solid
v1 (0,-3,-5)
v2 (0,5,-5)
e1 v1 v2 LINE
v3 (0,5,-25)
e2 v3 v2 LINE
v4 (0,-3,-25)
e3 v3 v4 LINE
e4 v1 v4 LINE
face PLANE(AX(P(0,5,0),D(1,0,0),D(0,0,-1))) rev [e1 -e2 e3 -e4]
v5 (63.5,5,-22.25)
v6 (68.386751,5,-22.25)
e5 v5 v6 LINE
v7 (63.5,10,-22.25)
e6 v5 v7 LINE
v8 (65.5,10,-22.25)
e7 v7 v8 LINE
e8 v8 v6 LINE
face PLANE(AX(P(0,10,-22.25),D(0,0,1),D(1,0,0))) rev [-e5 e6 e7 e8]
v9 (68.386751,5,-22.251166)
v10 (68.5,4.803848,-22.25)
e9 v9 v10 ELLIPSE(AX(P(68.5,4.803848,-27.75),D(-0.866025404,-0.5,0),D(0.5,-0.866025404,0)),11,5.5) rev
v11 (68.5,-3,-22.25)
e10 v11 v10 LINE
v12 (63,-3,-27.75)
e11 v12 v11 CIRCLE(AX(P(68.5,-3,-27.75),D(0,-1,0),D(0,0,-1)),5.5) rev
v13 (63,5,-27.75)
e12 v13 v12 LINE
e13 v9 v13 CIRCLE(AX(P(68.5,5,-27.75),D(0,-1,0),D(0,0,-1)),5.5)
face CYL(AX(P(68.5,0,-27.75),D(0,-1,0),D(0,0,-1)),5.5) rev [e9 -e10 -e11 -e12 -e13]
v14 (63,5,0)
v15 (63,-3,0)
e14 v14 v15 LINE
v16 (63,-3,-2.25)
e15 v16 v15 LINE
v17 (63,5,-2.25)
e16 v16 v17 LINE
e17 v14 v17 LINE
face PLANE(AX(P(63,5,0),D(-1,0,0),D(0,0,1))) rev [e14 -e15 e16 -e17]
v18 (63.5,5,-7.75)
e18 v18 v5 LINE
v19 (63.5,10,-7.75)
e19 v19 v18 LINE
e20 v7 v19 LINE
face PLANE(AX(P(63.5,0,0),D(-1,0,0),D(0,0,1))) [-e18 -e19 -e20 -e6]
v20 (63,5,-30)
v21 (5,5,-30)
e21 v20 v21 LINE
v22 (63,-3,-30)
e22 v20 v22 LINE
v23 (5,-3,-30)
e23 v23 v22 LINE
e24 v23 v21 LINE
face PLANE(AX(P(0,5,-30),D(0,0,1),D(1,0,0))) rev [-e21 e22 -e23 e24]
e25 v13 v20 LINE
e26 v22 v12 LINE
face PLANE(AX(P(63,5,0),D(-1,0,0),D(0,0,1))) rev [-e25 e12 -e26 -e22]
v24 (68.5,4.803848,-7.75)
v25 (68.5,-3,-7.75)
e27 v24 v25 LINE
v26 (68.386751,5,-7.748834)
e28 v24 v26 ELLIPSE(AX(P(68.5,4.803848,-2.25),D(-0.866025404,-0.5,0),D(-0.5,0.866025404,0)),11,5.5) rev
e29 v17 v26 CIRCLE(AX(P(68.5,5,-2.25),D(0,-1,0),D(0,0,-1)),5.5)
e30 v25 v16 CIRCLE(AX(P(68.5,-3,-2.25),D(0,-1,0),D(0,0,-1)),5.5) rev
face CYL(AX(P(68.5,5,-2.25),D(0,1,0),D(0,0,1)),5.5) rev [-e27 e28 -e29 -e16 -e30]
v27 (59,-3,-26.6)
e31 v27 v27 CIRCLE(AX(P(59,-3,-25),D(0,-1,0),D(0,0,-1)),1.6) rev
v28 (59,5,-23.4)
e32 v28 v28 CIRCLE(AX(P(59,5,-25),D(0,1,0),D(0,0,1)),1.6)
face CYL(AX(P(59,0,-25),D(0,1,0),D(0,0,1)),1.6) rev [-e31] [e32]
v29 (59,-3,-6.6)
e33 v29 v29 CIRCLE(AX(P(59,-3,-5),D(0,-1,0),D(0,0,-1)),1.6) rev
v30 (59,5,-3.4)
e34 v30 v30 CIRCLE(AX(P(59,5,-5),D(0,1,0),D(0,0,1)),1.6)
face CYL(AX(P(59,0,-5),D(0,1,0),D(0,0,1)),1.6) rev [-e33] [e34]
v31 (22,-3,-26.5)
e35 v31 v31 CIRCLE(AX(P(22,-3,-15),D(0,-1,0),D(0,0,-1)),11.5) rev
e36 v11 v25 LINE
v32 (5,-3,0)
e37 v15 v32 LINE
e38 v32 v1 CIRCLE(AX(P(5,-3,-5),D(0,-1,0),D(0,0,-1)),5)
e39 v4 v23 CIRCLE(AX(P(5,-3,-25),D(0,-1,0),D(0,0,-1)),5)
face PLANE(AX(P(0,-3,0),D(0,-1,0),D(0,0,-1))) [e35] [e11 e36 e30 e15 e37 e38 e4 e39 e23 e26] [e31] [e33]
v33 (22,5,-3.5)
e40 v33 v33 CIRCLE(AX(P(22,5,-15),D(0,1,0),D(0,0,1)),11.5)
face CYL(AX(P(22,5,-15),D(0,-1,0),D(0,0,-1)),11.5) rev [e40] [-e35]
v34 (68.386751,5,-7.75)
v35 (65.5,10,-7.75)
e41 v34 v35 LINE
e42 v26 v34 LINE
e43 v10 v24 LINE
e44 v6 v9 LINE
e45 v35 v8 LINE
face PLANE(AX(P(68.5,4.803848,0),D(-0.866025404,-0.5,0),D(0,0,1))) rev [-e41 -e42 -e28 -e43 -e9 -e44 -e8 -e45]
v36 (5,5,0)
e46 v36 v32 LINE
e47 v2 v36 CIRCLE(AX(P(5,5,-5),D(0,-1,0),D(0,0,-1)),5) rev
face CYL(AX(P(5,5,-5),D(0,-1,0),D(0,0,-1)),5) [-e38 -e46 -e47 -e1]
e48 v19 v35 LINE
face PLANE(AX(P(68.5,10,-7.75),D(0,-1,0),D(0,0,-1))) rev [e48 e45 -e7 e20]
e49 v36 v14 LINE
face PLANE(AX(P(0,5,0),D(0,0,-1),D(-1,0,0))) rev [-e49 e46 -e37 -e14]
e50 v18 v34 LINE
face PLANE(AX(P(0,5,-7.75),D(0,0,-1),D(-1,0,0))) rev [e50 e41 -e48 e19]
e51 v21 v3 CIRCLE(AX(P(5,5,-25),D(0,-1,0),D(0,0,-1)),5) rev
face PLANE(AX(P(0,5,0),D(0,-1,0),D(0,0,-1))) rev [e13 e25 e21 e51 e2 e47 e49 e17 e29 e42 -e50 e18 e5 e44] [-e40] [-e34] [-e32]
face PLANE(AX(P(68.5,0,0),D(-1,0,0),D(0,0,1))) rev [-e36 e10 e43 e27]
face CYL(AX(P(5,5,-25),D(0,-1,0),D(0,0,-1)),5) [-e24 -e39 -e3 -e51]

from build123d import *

# Parameters (mm, degrees)
SKETCH1_W           = 63
SKETCH1_H           = 30
SKETCH1_R           = 11.5
BOSS_EXTRUDE1_DEPTH = 5
SKETCH2_R           = 1.6
CUT_EXTRUDE1_DEPTH  = 70.95712973
FILLET1_R           = 5
SKETCH3_W           = 14.5
SKETCH3_H           = 5
BOSS_EXTRUDE2_DEPTH = 0.5
SKETCH4_W           = 14.5
SKETCH4_H           = 10
BOSS_EXTRUDE3_DEPTH = 5
FILLET2_R           = 5.5
SKETCH5_W           = 3.208712153
SKETCH5_H           = 5
CUT_EXTRUDE2_DEPTH  = 76.447001266
CHAMFER1_SIZE       = 5.196152423
CHAMFER1_SIZE_2     = 3
SKETCH6_R           = 1.6
SKETCH6_R_2         = 11.5
BOSS_EXTRUDE4_DEPTH = 3


with BuildPart() as part:
    # Sketch1 → Boss-Extrude1 (new body)
    with BuildSketch(Plane(origin=(0, 0, 0), x_dir=(1, 0, 0), z_dir=(0, 1, 0))):
        with Locations((31.5, 15)):
            Rectangle(SKETCH1_W, SKETCH1_H)
        with Locations(Location((22, 15, 0), (0, 0, 270))):
            Circle(SKETCH1_R, mode=Mode.SUBTRACT)
    extrude(amount=BOSS_EXTRUDE1_DEPTH)

    # Sketch2 → Cut-Extrude1 (cut, through all)
    with BuildSketch(Plane(origin=(0, 5, 0), x_dir=(1, 0, 0), z_dir=(0, 1, 0))):
        with Locations(Location((59, 25, 0), (0, 0, 270))):
            Circle(SKETCH2_R)
        with Locations(Location((59, 5, 0), (0, 0, 270))):
            Circle(SKETCH2_R)
    extrude(amount=-CUT_EXTRUDE1_DEPTH, mode=Mode.SUBTRACT)

    # Fillet1
    fillet1_edges = [part.edges().sort_by_distance(p)[0] for p in [
        (0, 2.5, -30),
        (0, 2.5, 0),
    ]]
    fillet(fillet1_edges, radius=FILLET1_R)

    # Sketch3 → Boss-Extrude2 (add)
    with BuildSketch(Plane(origin=(63, 0, 0), x_dir=(0, 0, -1), z_dir=(1, 0, 0))):
        with Locations((15, 2.5)):
            Rectangle(SKETCH3_W, SKETCH3_H)
    extrude(amount=BOSS_EXTRUDE2_DEPTH)

    # Sketch4 → Boss-Extrude3 (add)
    with BuildSketch(Plane(origin=(63.5, 0, 0), x_dir=(0, 0, -1), z_dir=(1, 0, 0))):
        with Locations((15, 5)):
            Rectangle(SKETCH4_W, SKETCH4_H)
    extrude(amount=BOSS_EXTRUDE3_DEPTH)

    # Fillet2
    # the kernel refuses this fillet: 5.5 mm, written as the material it adds along each edge
    with BuildSketch(Plane(origin=(63, 18.75, -7.75), x_dir=(1, 0, 0), z_dir=(0, -1, 0))) as fillet2_piece_1_section:
        with BuildLine():
            CenterArc((FILLET2_R, FILLET2_R), FILLET2_R, 180, 90)
            Line((0, FILLET2_R), (0, 0))
            Line((0, 0), (FILLET2_R, 0))
        make_face()
    fillet2_piece_1 = extrude(amount=18.75, mode=Mode.PRIVATE)
    fillet2_piece_1 = split(fillet2_piece_1, bisect_by=Plane(origin=(64.81097146, 5, -6.96855226), z_dir=(0, 1, 0)), keep=Keep.TOP, mode=Mode.PRIVATE)
    fillet2_piece_1 = split(fillet2_piece_1, bisect_by=Plane(origin=(64.81097146, 10, -6.96855226), z_dir=(0, -1, 0)), keep=Keep.TOP, mode=Mode.PRIVATE)
    fillet2_piece_1 = split(fillet2_piece_1, bisect_by=Plane(origin=(63.5, 7.5, -6.96855226), z_dir=(1, 0, 0)), keep=Keep.TOP, mode=Mode.PRIVATE)
    add(fillet2_piece_1)
    with BuildSketch(Plane(origin=(63, 5, -7.75), x_dir=(1, 0, 0), z_dir=(0, -1, 0))) as fillet2_piece_2_section:
        with BuildLine():
            CenterArc((FILLET2_R, FILLET2_R), FILLET2_R, 180, 90)
            Line((0, FILLET2_R), (0, 0))
            Line((0, 0), (FILLET2_R, 0))
        make_face()
    fillet2_piece_2 = extrude(amount=5, mode=Mode.PRIVATE)
    fillet2_piece_2 = split(fillet2_piece_2, bisect_by=Plane(origin=(63.5, 2.5, -6.96855226), z_dir=(1, 0, 0)), keep=Keep.TOP, mode=Mode.PRIVATE)
    add(fillet2_piece_2)
    with BuildSketch(Plane(origin=(63, 5, -7.75), x_dir=(1, 0, 0), z_dir=(0, -1, 0))) as fillet2_piece_3_section:
        with BuildLine():
            CenterArc((FILLET2_R, FILLET2_R), FILLET2_R, 180, 90)
            Line((0, FILLET2_R), (0, 0))
            Line((0, 0), (FILLET2_R, 0))
        make_face()
    fillet2_piece_3 = extrude(amount=5, mode=Mode.PRIVATE)
    fillet2_piece_3 = split(fillet2_piece_3, bisect_by=Plane(origin=(63.5, 2.5, -5.619274201), z_dir=(-1, 0, 0)), keep=Keep.TOP, mode=Mode.PRIVATE)
    add(fillet2_piece_3)
    with BuildSketch(Plane(origin=(63, 0, -22.25), x_dir=(0, 0, -1), z_dir=(0, 1, 0))) as fillet2_piece_4_section:
        with BuildLine():
            CenterArc((FILLET2_R, -FILLET2_R), FILLET2_R, 90, 90)
            Line((0, -FILLET2_R), (0, 0))
            Line((0, 0), (FILLET2_R, 0))
        make_face()
    fillet2_piece_4 = extrude(amount=5, mode=Mode.PRIVATE)
    fillet2_piece_4 = split(fillet2_piece_4, bisect_by=Plane(origin=(63.5, 2.5, -24.380725799), z_dir=(-1, 0, 0)), keep=Keep.TOP, mode=Mode.PRIVATE)
    add(fillet2_piece_4)
    with BuildSketch(Plane(origin=(63, 0, -22.25), x_dir=(0, 0, -1), z_dir=(0, 1, 0))) as fillet2_piece_5_section:
        with BuildLine():
            CenterArc((FILLET2_R, -FILLET2_R), FILLET2_R, 90, 90)
            Line((0, -FILLET2_R), (0, 0))
            Line((0, 0), (FILLET2_R, 0))
        make_face()
    fillet2_piece_5 = extrude(amount=5, mode=Mode.PRIVATE)
    fillet2_piece_5 = split(fillet2_piece_5, bisect_by=Plane(origin=(63.5, 2.5, -23.03144774), z_dir=(1, 0, 0)), keep=Keep.TOP, mode=Mode.PRIVATE)
    add(fillet2_piece_5)
    with BuildSketch(Plane(origin=(63, 0, -22.25), x_dir=(0, 0, -1), z_dir=(0, 1, 0))) as fillet2_piece_6_section:
        with BuildLine():
            CenterArc((FILLET2_R, -FILLET2_R), FILLET2_R, 90, 90)
            Line((0, -FILLET2_R), (0, 0))
            Line((0, 0), (FILLET2_R, 0))
        make_face()
    fillet2_piece_6 = extrude(amount=18.75, mode=Mode.PRIVATE)
    fillet2_piece_6 = split(fillet2_piece_6, bisect_by=Plane(origin=(64.81097146, 5, -23.03144774), z_dir=(0, 1, 0)), keep=Keep.TOP, mode=Mode.PRIVATE)
    fillet2_piece_6 = split(fillet2_piece_6, bisect_by=Plane(origin=(64.81097146, 10, -23.03144774), z_dir=(0, -1, 0)), keep=Keep.TOP, mode=Mode.PRIVATE)
    fillet2_piece_6 = split(fillet2_piece_6, bisect_by=Plane(origin=(63.5, 7.5, -23.03144774), z_dir=(1, 0, 0)), keep=Keep.TOP, mode=Mode.PRIVATE)
    add(fillet2_piece_6)

    # Sketch5 → Cut-Extrude2 (cut, through all)
    with BuildSketch(Plane(origin=(68.5, 0, 0), x_dir=(0, 0, -1), z_dir=(1, 0, 0))):
        with Locations((6.145643924, 7.5)):
            Rectangle(SKETCH5_W, SKETCH5_H)
        with Locations((23.854356077, 7.5)):
            Rectangle(SKETCH5_W, SKETCH5_H)
    extrude(amount=-CUT_EXTRUDE2_DEPTH, mode=Mode.SUBTRACT)

    # Chamfer1
    # the kernel refuses this chamfer: 5.196152423, 3 mm, written as the material it takes off along each edge
    with BuildSketch(Plane(origin=(68.5, 10, -35.692891912), x_dir=(0.01932676561270102, -0.9998132206222079, 0), z_dir=(0, 0, 1))) as chamfer1_piece_1:
        Polygon((CHAMFER1_SIZE * 0.999813220566, -CHAMFER1_SIZE * 0.0193267656116), (-CHAMFER1_SIZE_2 * 0.0193267656127, -CHAMFER1_SIZE_2 * 0.999813220622), (0, 0), align=None)
    extrude(amount=41.385783824, mode=Mode.SUBTRACT)

    # Sketch6 → Boss-Extrude4 (add)
    with BuildSketch(Plane.XZ):
        with BuildLine():
            Line((63, -2.25), (63, 0))
            Line((63, 0), (5, 0))
            ThreePointArc((5, 0), (1.464466094, -1.464466094), (0, -5))
            Line((0, -5), (0, -25))
            ThreePointArc((0, -25), (1.464466094, -28.535533906), (5, -30))
            Line((5, -30), (63, -30))
            Line((63, -30), (63, -27.75))
            ThreePointArc((63, -27.75), (64.610912703, -23.860912703), (68.5, -22.25))
            Line((68.5, -22.25), (68.5, -7.75))
            ThreePointArc((68.5, -7.75), (64.610912703, -6.139087297), (63, -2.25))
        make_face()
        with Locations(Location((59, -5, 0), (0, 0, 90))):
            Circle(SKETCH6_R, mode=Mode.SUBTRACT)
        with Locations(Location((22, -15, 0), (0, 0, 270))):
            Circle(SKETCH6_R_2, mode=Mode.SUBTRACT)
        with Locations(Location((59, -25, 0), (0, 0, 90))):
            Circle(SKETCH6_R, mode=Mode.SUBTRACT)
    extrude(amount=BOSS_EXTRUDE4_DEPTH)


solid = part.part
